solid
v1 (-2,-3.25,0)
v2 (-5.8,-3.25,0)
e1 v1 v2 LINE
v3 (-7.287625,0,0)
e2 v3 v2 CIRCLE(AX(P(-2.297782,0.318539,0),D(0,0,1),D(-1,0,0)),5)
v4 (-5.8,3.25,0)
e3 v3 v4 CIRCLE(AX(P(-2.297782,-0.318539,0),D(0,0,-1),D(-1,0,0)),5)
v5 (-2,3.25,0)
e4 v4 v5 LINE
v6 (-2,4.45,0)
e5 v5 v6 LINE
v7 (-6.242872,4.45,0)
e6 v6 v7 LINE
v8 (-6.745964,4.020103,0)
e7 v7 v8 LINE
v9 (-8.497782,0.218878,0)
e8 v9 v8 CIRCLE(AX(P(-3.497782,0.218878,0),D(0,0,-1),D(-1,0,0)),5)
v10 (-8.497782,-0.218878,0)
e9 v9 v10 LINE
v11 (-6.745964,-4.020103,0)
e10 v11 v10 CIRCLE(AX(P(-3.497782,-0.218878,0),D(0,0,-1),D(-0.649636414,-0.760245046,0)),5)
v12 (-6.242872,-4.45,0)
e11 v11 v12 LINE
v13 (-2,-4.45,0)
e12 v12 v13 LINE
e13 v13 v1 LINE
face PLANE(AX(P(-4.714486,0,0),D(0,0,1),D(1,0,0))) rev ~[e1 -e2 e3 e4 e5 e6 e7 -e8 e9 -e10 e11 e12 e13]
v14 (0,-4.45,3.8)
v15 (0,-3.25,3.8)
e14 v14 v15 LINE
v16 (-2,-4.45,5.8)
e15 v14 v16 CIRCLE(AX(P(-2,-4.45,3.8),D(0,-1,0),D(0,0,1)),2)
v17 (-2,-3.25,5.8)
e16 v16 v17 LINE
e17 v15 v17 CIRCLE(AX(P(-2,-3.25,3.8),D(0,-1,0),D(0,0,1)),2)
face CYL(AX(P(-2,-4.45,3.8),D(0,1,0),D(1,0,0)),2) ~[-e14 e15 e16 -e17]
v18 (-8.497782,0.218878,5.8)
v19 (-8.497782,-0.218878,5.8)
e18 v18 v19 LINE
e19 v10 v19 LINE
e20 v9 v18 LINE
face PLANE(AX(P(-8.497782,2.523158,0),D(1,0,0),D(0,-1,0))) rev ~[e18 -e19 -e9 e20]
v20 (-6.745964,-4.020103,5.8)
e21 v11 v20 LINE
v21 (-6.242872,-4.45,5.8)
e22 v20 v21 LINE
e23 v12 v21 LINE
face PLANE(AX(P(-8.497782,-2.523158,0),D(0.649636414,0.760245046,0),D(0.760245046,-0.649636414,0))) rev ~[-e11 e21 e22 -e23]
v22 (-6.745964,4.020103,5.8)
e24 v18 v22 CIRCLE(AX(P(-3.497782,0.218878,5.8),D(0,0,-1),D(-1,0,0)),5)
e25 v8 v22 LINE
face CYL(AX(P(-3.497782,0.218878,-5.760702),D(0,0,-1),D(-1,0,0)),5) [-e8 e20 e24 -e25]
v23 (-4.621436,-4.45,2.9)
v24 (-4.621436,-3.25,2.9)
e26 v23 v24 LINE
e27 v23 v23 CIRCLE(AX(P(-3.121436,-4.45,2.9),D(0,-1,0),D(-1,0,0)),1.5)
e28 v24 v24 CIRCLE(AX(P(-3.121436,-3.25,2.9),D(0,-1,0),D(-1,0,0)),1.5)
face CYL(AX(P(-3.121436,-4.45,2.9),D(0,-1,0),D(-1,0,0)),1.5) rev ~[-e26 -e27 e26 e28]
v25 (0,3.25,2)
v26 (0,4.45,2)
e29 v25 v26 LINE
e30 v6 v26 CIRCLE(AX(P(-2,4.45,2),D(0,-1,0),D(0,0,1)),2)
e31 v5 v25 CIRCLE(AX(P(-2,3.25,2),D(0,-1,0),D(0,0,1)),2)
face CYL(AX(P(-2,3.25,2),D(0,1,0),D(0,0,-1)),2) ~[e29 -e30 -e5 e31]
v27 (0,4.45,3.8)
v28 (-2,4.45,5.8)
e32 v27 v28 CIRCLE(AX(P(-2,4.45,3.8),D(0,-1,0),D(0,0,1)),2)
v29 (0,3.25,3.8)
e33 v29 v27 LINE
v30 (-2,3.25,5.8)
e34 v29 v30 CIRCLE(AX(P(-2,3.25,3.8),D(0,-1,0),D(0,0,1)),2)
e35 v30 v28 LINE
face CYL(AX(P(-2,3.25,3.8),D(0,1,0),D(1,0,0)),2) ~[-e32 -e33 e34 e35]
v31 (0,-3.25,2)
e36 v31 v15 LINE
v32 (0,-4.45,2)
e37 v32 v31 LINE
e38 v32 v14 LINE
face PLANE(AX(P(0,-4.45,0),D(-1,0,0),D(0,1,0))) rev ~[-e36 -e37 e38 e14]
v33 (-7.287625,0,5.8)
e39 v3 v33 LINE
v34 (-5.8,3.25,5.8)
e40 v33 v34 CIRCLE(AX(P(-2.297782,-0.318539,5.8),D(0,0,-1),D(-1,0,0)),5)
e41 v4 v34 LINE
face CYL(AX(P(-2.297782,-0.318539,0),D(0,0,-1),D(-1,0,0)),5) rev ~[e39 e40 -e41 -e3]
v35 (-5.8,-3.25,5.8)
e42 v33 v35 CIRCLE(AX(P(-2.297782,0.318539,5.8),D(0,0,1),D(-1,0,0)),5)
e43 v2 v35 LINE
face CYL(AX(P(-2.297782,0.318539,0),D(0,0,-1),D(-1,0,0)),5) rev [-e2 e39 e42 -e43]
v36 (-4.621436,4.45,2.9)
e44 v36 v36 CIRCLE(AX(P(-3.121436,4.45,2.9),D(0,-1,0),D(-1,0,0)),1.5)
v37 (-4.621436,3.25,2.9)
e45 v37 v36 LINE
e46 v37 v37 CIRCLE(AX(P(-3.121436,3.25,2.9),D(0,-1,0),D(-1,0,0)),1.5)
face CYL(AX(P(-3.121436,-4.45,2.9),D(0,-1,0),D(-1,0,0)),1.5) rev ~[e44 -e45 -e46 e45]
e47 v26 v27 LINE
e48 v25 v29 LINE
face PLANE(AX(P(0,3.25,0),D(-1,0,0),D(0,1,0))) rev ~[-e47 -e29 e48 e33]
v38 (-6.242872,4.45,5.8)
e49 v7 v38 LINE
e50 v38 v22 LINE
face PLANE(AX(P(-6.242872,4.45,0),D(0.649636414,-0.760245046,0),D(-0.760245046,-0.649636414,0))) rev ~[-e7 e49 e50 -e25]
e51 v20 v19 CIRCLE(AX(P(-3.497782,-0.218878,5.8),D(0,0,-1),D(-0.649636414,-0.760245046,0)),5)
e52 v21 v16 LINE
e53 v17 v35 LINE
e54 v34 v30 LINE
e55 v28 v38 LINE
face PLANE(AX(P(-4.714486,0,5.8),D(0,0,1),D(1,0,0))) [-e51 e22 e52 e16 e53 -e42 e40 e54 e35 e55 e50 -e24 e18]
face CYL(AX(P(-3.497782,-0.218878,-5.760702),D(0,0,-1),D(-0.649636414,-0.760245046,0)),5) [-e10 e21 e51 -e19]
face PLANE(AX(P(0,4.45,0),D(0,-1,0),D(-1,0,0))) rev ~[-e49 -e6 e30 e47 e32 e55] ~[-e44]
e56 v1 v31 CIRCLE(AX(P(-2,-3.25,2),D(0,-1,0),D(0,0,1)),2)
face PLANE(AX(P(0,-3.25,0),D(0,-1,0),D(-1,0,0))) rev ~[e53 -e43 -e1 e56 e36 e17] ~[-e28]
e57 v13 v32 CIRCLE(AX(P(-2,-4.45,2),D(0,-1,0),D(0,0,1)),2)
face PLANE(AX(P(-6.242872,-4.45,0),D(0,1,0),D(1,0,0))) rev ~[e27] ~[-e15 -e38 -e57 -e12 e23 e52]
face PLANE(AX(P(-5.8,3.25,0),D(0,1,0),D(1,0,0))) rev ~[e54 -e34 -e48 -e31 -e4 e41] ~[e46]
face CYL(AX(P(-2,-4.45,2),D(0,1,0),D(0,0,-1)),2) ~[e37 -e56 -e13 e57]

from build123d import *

# Parameters (mm, degrees)
F2_DEPTH    = 5.8
F3_T1_DEPTH = 17.3214031257
F3_T3_DEPTH = 5.8
F5_DEPTH    = 8.901
F6_R        = 2


# Not quite as in the source:
# - a fillet or chamfer that OpenCascade refuses, or shapes differently, is made with other operations: its cross-section is extruded or revolved along the edge and cut away or added


with BuildPart() as f2:
    # F1 (on Top) → F2 (new body)
    with BuildSketch(Plane.XY):
        Polygon((-7.2977824063, -1.970131098), (-7.2977824063, 0), (-7.2977824063, 1.970131098), (-5.8, 3.25), (0, 3.25), (0, 4.45), (-6.2428722575, 4.45), (-8.4977824063, 2.523158448), (-8.4977824063, 0), (-8.4977824063, -2.523158448), (-6.2428722575, -4.45), (0, -4.45), (0, -3.25), (-5.8, -3.25), align=None)
    extrude(amount=F2_DEPTH)

    # F3: fillet of radius 5 on 4 edges, made by hand

    # F3_s2 → F3_t1 (cut)
    with BuildSketch(Plane.XY.offset(-5.7607015629)):
        with BuildLine():
            ThreePointArc((-6.7459644775, -4.0201030507), (-8.0387575415, -2.3116140275), (-8.4977824063, -0.2188778229))
            Line((-8.4977824063, -0.2188778229), (-8.5977824063, -0.2188778229))
            Line((-8.5977824063, -0.2188778229), (-8.5977824063, -2.5692440605))
            Line((-8.5977824063, -2.5692440605), (-6.8109281189, -4.0961275552))
            Line((-6.8109281189, -4.0961275552), (-6.7459644775, -4.0201030507))
        make_face()
        with BuildLine():
            ThreePointArc((-8.4977824063, 0.2188778229), (-8.0387575415, 2.3116140275), (-6.7459644775, 4.0201030507))
            Line((-6.7459644775, 4.0201030507), (-6.8109281189, 4.0961275552))
            Line((-6.8109281189, 4.0961275552), (-8.5977824063, 2.5692440605))
            Line((-8.5977824063, 2.5692440605), (-8.5977824063, 0.2188778229))
            Line((-8.5977824063, 0.2188778229), (-8.4977824063, 0.2188778229))
        make_face()
    extrude(amount=F3_T1_DEPTH, mode=Mode.SUBTRACT)

    # F3_s4 → F3_t3 (join)
    with BuildSketch(Plane.XY):
        with BuildLine():
            ThreePointArc((-7.2977824063, 0.3185391867), (-6.9081559253, -1.6165205064), (-5.8, -3.25))
            Line((-5.8, -3.25), (-5.8700443519, -3.3213707837))
            ThreePointArc((-5.8700443519, -3.3213707837), (-6.6138548446, -2.6860900535), (-7.3627460478, -2.0461556025))
            Line((-7.3627460478, -2.0461556025), (-7.3977824063, -1.970131098))
            Line((-7.3977824063, -1.970131098), (-7.3977824063, 0.3185391867))
            Line((-7.3977824063, 0.3185391867), (-7.2977824063, 0.3185391867))
        make_face()
        with BuildLine():
            ThreePointArc((-7.2977824063, -0.3185391867), (-6.9081559253, 1.6165205064), (-5.8, 3.25))
            Line((-5.8, 3.25), (-5.8700443519, 3.3213707837))
            ThreePointArc((-5.8700443519, 3.3213707837), (-6.6138548446, 2.6860900535), (-7.3627460478, 2.0461556025))
            Line((-7.3627460478, 2.0461556025), (-7.3977824063, 1.970131098))
            Line((-7.3977824063, 1.970131098), (-7.3977824063, -0.3185391867))
            Line((-7.3977824063, -0.3185391867), (-7.2977824063, -0.3185391867))
        make_face()
    extrude(amount=F3_T3_DEPTH)

    # F4 (on face) → F5 (cut, through all)
    with BuildSketch(Plane.XZ.offset(4.45)):
        with BuildLine():
            Line((-4.6214361287, 2.9), (-3.1214361287, 2.9))
            Line((-3.1214361287, 2.9), (-1.6214361287, 2.9))
            ThreePointArc((-1.6214361287, 2.9), (-3.1214361287, 4.4), (-4.6214361287, 2.9))
        make_face()
        with BuildLine():
            Line((-1.6214361287, 2.9), (-3.1214361287, 2.9))
            Line((-3.1214361287, 2.9), (-4.6214361287, 2.9))
            ThreePointArc((-4.6214361287, 2.9), (-3.1214361287, 1.4), (-1.6214361287, 2.9))
        make_face()
    extrude(amount=-F5_DEPTH, mode=Mode.SUBTRACT)

    # F6
    f6_edges = [f2.edges().sort_by_distance(p)[0] for p in [
        (0, 3.85, 5.8),
        (0, -3.85, 5.8),
        (0, 3.85, 0),
        (0, -3.85, 0),
    ]]
    fillet(f6_edges, radius=F6_R)


solid = f2.part
